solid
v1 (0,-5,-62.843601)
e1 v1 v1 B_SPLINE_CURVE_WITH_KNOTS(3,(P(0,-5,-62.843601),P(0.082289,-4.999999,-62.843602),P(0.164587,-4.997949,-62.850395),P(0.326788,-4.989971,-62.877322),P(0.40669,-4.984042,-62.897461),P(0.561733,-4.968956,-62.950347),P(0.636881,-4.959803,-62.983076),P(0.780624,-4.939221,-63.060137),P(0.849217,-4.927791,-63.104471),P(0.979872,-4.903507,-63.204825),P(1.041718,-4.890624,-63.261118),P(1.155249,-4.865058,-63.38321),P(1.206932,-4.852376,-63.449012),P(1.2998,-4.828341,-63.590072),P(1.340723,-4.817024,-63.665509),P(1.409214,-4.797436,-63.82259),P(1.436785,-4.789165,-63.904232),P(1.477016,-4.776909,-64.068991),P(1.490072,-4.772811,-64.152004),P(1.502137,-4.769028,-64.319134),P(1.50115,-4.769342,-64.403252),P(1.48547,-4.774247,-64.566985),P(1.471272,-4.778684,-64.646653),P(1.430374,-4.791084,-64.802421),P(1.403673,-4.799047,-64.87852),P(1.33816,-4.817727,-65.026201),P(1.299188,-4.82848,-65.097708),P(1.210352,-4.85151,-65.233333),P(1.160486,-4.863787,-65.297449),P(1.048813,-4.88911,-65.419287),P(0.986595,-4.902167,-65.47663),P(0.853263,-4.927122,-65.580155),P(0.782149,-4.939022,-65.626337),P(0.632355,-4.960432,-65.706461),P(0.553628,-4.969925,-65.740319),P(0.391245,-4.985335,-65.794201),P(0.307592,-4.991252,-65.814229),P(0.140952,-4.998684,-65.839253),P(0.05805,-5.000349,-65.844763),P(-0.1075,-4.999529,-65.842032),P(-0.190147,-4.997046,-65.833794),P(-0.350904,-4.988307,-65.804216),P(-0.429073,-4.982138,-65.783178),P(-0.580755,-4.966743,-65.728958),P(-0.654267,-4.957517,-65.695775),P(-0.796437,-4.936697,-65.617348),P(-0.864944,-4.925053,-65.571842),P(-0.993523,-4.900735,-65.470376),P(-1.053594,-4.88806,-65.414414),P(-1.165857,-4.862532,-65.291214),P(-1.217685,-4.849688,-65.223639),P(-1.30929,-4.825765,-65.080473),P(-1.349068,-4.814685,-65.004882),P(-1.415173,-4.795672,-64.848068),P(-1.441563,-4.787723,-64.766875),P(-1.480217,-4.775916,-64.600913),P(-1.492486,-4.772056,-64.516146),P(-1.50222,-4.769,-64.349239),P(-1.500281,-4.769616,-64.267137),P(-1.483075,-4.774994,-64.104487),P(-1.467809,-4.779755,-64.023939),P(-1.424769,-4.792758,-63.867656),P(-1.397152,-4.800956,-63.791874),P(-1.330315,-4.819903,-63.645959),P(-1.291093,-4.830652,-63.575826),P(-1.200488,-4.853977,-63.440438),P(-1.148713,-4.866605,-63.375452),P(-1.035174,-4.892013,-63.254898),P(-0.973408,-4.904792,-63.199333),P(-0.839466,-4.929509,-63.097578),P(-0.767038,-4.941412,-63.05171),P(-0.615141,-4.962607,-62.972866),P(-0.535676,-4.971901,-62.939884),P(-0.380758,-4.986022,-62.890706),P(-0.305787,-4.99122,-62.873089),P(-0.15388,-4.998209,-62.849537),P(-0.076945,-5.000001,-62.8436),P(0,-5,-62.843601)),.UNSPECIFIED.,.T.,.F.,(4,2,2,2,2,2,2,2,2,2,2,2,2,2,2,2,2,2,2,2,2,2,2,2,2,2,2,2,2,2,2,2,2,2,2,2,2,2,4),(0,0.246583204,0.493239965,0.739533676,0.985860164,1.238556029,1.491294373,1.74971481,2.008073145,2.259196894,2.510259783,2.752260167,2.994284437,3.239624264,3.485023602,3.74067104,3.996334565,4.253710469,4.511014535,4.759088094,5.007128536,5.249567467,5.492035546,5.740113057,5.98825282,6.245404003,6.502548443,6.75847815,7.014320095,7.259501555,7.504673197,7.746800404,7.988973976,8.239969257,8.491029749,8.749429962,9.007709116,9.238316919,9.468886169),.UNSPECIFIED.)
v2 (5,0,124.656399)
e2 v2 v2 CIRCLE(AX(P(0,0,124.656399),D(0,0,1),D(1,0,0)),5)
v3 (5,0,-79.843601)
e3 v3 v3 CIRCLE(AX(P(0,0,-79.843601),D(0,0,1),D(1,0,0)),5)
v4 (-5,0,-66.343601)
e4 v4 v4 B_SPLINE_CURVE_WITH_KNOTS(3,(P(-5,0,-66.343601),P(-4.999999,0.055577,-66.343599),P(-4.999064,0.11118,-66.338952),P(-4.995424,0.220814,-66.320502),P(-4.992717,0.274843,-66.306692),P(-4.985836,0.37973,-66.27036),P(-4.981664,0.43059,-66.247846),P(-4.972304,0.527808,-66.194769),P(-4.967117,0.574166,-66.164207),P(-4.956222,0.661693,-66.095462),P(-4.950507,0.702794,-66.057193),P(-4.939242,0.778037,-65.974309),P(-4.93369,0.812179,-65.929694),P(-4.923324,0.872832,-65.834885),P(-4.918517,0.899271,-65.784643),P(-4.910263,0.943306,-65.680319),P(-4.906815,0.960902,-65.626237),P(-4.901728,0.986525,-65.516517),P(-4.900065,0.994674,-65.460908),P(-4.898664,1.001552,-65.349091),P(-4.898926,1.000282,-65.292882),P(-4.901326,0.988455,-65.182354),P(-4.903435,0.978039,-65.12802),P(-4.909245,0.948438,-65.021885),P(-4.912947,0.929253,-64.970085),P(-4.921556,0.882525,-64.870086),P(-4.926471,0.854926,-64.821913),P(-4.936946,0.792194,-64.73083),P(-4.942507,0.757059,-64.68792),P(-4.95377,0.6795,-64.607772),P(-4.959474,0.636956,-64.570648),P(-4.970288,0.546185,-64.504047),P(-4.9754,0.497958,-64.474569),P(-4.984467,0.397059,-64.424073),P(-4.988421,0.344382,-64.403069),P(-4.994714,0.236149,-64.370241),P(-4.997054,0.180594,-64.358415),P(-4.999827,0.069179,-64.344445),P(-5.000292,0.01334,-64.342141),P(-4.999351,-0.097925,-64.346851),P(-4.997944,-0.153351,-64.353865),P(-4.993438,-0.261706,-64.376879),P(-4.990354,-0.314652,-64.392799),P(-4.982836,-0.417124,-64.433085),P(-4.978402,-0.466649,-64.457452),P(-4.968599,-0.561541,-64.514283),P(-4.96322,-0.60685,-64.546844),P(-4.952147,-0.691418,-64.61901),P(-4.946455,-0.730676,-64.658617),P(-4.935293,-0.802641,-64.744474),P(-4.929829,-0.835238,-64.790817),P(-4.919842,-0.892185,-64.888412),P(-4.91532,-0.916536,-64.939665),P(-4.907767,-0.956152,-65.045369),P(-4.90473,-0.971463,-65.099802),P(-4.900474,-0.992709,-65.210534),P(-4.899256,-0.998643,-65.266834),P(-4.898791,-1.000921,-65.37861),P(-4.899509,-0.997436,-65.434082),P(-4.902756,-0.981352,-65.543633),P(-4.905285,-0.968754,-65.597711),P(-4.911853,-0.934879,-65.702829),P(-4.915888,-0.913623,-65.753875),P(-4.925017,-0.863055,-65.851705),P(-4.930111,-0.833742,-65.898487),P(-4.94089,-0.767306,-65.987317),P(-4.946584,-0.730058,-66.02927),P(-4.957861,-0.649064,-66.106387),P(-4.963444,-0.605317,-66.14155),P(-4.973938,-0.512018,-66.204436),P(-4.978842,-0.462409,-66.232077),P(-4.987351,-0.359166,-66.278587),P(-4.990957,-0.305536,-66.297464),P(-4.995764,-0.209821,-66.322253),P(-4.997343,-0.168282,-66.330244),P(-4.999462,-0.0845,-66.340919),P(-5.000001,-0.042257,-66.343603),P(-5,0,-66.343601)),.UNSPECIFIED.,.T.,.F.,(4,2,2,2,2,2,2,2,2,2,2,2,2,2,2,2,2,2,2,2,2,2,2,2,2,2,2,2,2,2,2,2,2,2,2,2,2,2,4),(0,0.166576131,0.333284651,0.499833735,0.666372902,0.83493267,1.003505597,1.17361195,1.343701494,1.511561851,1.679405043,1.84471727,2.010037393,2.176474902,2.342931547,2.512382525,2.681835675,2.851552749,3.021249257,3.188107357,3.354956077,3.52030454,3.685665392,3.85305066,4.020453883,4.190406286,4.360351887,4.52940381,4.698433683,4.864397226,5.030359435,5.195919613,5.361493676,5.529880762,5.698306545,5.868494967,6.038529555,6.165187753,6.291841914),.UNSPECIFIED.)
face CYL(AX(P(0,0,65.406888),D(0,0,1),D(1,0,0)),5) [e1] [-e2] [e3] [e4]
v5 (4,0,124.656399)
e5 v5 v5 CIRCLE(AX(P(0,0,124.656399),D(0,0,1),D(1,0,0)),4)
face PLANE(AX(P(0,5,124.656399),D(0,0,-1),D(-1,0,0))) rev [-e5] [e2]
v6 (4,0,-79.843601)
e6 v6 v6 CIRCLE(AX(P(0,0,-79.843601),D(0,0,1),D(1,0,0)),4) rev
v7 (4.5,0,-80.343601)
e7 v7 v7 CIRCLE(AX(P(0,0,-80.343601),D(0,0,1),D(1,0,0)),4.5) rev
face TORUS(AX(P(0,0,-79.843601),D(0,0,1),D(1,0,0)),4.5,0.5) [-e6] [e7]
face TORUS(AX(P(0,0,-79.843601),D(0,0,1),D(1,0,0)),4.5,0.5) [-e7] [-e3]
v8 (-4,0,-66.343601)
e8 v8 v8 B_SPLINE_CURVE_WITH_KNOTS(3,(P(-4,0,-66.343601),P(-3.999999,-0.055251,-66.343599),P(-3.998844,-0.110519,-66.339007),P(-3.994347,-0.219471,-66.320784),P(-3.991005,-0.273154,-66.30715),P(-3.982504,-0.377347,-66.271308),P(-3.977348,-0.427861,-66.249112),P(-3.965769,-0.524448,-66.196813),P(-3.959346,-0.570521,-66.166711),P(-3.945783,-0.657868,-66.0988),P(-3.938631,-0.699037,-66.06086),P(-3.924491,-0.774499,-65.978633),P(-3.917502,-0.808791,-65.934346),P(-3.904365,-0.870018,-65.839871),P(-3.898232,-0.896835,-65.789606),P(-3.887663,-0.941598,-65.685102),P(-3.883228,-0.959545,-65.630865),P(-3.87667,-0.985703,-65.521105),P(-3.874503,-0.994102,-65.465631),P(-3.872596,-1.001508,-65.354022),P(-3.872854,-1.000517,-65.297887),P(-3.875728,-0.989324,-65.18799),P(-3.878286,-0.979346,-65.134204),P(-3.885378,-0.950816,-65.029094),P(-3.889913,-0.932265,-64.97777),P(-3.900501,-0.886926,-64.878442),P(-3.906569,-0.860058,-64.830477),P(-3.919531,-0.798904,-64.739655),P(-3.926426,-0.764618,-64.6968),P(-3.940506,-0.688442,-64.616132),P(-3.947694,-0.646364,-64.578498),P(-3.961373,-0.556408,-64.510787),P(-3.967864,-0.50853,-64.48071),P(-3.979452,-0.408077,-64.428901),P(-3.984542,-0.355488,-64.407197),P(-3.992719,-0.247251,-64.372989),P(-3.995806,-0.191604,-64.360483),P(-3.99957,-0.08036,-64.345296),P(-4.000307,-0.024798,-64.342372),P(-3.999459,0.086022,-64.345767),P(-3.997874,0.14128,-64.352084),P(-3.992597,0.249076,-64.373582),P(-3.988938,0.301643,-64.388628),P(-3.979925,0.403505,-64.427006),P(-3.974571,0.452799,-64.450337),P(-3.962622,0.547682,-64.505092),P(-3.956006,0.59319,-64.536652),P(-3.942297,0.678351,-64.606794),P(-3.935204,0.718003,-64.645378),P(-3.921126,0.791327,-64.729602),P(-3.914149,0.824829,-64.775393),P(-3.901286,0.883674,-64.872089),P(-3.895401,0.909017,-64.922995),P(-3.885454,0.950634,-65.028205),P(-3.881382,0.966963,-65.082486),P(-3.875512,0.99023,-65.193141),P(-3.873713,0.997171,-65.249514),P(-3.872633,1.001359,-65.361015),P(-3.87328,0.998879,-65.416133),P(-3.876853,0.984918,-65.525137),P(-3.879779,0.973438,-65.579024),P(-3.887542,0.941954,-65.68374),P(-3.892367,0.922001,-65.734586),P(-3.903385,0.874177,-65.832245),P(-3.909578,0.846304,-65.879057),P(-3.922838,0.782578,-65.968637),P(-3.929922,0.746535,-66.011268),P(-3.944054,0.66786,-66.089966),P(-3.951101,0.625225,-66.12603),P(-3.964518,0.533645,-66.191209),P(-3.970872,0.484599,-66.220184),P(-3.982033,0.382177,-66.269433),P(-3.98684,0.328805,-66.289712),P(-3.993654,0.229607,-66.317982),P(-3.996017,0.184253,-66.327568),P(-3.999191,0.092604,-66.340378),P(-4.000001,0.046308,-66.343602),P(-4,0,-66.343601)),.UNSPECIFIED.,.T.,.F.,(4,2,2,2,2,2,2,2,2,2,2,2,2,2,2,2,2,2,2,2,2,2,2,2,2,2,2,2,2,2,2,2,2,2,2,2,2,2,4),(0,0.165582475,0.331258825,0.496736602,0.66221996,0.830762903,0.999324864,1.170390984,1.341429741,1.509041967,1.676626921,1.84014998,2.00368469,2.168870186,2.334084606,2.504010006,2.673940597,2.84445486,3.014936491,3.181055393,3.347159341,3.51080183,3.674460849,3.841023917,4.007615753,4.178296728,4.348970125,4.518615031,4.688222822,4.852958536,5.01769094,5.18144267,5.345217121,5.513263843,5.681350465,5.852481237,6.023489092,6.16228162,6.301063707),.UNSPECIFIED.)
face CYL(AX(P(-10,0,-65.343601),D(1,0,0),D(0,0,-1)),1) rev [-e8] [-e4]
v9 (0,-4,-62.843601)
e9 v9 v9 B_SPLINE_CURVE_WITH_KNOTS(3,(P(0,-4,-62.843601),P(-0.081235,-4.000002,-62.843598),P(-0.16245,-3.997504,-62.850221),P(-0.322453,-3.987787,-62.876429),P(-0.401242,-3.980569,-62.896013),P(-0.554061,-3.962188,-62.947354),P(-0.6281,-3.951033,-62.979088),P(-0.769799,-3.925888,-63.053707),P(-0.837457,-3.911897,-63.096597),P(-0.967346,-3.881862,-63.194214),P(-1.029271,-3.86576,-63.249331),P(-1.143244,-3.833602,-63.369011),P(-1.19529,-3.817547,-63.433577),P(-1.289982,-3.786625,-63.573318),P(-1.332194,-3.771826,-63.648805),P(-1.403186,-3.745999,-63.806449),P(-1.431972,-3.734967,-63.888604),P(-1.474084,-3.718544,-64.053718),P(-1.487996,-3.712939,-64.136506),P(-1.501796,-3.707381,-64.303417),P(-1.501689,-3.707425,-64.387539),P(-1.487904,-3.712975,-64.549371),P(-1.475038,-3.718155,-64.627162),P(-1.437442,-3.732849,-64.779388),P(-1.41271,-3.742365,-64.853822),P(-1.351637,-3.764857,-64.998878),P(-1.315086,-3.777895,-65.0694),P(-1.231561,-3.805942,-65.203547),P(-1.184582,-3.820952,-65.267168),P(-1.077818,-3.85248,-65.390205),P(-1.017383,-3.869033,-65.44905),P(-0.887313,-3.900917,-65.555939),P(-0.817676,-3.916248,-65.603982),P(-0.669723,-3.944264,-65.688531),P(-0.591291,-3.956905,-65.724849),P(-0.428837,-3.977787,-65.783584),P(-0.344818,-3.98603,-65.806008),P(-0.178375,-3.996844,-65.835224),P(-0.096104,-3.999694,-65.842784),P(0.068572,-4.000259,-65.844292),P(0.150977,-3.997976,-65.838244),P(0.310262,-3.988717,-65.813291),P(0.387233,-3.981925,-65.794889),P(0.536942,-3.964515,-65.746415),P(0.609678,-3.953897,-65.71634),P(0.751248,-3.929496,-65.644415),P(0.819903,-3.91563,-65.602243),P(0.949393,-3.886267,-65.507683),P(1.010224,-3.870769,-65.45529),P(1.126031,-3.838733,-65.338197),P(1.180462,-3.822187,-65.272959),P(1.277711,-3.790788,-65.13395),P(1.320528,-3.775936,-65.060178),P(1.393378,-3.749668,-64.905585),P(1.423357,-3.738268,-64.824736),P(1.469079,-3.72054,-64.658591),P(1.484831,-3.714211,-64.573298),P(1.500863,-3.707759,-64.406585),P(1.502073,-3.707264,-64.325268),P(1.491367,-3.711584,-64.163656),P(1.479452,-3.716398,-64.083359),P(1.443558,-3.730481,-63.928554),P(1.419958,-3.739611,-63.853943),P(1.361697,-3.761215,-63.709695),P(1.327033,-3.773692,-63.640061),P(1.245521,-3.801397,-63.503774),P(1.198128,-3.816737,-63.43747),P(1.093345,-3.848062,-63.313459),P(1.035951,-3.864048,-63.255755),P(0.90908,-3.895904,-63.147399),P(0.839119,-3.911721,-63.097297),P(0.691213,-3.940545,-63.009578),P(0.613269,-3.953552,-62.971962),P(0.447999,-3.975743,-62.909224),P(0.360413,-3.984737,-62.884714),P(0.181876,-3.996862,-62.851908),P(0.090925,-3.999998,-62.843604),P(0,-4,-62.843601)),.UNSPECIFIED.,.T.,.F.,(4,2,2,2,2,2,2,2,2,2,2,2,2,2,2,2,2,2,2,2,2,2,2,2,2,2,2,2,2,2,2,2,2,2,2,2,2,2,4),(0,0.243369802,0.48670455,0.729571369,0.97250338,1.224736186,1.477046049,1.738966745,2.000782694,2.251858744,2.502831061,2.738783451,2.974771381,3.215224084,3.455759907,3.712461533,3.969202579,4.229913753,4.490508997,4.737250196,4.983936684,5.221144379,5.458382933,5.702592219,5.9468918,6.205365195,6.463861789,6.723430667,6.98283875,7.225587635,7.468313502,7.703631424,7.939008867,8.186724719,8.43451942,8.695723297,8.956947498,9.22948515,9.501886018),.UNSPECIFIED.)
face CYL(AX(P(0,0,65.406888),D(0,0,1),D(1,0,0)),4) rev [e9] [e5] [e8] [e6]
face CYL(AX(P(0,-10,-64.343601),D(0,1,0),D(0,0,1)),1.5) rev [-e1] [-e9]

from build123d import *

# Parameters (mm, degrees)
SCHIZZO1_W               = 205
SCHIZZO1_H               = 1
SCHIZZO2_R               = 1.5
TAGLIO_ESTRUSIONE1_DEPTH = 10
SCHIZZO3_R               = 1
TAGLIO_ESTRUSIONE2_DEPTH = 10
RACCORDO4_R              = 0.5


with BuildPart() as part:
    # Schizzo1 → Rivoluzione1 (revolve)
    with BuildSketch(Plane(origin=(0, 0, 0), x_dir=(0, 0, -1), z_dir=(1, 0, 0)), mode=Mode.PRIVATE) as rivoluzione1_sk:
        with Locations((-22.156399009, 4.5)):
            Rectangle(SCHIZZO1_W, SCHIZZO1_H)
    revolve(rivoluzione1_sk.sketch.rotate(Axis((0, 0, 65.406887886), (0, 0, -1)), 90), axis=Axis((0, 0, 65.406887886), (0, 0, -1)))

    # Schizzo2 → Taglio-Estrusione1 (cut)
    with BuildSketch(Plane(origin=(0, 0, 0), x_dir=(1, 0, 0), z_dir=(0, 1, 0))):
        with Locations(Location((0, 64.343600991, 0), (0, 0, 270))):
            Circle(SCHIZZO2_R)
    extrude(amount=-TAGLIO_ESTRUSIONE1_DEPTH, mode=Mode.SUBTRACT)

    # Schizzo3 → Taglio-Estrusione2 (cut)
    with BuildSketch(Plane(origin=(0, 0, 0), x_dir=(0, 0, -1), z_dir=(1, 0, 0))):
        with Locations((65.343600991, 0)):
            Circle(SCHIZZO3_R)
    extrude(amount=-TAGLIO_ESTRUSIONE2_DEPTH, mode=Mode.SUBTRACT)

    # Raccordo4
    raccordo4_edges = [part.edges().sort_by_distance(p)[0] for p in [
        (-5, 0, -80.343600991),
        (-4, 0, -80.343600991),
    ]]
    fillet(raccordo4_edges, radius=RACCORDO4_R - 0.0001)  # a hair under: the kernel refuses the full size


solid = part.part
